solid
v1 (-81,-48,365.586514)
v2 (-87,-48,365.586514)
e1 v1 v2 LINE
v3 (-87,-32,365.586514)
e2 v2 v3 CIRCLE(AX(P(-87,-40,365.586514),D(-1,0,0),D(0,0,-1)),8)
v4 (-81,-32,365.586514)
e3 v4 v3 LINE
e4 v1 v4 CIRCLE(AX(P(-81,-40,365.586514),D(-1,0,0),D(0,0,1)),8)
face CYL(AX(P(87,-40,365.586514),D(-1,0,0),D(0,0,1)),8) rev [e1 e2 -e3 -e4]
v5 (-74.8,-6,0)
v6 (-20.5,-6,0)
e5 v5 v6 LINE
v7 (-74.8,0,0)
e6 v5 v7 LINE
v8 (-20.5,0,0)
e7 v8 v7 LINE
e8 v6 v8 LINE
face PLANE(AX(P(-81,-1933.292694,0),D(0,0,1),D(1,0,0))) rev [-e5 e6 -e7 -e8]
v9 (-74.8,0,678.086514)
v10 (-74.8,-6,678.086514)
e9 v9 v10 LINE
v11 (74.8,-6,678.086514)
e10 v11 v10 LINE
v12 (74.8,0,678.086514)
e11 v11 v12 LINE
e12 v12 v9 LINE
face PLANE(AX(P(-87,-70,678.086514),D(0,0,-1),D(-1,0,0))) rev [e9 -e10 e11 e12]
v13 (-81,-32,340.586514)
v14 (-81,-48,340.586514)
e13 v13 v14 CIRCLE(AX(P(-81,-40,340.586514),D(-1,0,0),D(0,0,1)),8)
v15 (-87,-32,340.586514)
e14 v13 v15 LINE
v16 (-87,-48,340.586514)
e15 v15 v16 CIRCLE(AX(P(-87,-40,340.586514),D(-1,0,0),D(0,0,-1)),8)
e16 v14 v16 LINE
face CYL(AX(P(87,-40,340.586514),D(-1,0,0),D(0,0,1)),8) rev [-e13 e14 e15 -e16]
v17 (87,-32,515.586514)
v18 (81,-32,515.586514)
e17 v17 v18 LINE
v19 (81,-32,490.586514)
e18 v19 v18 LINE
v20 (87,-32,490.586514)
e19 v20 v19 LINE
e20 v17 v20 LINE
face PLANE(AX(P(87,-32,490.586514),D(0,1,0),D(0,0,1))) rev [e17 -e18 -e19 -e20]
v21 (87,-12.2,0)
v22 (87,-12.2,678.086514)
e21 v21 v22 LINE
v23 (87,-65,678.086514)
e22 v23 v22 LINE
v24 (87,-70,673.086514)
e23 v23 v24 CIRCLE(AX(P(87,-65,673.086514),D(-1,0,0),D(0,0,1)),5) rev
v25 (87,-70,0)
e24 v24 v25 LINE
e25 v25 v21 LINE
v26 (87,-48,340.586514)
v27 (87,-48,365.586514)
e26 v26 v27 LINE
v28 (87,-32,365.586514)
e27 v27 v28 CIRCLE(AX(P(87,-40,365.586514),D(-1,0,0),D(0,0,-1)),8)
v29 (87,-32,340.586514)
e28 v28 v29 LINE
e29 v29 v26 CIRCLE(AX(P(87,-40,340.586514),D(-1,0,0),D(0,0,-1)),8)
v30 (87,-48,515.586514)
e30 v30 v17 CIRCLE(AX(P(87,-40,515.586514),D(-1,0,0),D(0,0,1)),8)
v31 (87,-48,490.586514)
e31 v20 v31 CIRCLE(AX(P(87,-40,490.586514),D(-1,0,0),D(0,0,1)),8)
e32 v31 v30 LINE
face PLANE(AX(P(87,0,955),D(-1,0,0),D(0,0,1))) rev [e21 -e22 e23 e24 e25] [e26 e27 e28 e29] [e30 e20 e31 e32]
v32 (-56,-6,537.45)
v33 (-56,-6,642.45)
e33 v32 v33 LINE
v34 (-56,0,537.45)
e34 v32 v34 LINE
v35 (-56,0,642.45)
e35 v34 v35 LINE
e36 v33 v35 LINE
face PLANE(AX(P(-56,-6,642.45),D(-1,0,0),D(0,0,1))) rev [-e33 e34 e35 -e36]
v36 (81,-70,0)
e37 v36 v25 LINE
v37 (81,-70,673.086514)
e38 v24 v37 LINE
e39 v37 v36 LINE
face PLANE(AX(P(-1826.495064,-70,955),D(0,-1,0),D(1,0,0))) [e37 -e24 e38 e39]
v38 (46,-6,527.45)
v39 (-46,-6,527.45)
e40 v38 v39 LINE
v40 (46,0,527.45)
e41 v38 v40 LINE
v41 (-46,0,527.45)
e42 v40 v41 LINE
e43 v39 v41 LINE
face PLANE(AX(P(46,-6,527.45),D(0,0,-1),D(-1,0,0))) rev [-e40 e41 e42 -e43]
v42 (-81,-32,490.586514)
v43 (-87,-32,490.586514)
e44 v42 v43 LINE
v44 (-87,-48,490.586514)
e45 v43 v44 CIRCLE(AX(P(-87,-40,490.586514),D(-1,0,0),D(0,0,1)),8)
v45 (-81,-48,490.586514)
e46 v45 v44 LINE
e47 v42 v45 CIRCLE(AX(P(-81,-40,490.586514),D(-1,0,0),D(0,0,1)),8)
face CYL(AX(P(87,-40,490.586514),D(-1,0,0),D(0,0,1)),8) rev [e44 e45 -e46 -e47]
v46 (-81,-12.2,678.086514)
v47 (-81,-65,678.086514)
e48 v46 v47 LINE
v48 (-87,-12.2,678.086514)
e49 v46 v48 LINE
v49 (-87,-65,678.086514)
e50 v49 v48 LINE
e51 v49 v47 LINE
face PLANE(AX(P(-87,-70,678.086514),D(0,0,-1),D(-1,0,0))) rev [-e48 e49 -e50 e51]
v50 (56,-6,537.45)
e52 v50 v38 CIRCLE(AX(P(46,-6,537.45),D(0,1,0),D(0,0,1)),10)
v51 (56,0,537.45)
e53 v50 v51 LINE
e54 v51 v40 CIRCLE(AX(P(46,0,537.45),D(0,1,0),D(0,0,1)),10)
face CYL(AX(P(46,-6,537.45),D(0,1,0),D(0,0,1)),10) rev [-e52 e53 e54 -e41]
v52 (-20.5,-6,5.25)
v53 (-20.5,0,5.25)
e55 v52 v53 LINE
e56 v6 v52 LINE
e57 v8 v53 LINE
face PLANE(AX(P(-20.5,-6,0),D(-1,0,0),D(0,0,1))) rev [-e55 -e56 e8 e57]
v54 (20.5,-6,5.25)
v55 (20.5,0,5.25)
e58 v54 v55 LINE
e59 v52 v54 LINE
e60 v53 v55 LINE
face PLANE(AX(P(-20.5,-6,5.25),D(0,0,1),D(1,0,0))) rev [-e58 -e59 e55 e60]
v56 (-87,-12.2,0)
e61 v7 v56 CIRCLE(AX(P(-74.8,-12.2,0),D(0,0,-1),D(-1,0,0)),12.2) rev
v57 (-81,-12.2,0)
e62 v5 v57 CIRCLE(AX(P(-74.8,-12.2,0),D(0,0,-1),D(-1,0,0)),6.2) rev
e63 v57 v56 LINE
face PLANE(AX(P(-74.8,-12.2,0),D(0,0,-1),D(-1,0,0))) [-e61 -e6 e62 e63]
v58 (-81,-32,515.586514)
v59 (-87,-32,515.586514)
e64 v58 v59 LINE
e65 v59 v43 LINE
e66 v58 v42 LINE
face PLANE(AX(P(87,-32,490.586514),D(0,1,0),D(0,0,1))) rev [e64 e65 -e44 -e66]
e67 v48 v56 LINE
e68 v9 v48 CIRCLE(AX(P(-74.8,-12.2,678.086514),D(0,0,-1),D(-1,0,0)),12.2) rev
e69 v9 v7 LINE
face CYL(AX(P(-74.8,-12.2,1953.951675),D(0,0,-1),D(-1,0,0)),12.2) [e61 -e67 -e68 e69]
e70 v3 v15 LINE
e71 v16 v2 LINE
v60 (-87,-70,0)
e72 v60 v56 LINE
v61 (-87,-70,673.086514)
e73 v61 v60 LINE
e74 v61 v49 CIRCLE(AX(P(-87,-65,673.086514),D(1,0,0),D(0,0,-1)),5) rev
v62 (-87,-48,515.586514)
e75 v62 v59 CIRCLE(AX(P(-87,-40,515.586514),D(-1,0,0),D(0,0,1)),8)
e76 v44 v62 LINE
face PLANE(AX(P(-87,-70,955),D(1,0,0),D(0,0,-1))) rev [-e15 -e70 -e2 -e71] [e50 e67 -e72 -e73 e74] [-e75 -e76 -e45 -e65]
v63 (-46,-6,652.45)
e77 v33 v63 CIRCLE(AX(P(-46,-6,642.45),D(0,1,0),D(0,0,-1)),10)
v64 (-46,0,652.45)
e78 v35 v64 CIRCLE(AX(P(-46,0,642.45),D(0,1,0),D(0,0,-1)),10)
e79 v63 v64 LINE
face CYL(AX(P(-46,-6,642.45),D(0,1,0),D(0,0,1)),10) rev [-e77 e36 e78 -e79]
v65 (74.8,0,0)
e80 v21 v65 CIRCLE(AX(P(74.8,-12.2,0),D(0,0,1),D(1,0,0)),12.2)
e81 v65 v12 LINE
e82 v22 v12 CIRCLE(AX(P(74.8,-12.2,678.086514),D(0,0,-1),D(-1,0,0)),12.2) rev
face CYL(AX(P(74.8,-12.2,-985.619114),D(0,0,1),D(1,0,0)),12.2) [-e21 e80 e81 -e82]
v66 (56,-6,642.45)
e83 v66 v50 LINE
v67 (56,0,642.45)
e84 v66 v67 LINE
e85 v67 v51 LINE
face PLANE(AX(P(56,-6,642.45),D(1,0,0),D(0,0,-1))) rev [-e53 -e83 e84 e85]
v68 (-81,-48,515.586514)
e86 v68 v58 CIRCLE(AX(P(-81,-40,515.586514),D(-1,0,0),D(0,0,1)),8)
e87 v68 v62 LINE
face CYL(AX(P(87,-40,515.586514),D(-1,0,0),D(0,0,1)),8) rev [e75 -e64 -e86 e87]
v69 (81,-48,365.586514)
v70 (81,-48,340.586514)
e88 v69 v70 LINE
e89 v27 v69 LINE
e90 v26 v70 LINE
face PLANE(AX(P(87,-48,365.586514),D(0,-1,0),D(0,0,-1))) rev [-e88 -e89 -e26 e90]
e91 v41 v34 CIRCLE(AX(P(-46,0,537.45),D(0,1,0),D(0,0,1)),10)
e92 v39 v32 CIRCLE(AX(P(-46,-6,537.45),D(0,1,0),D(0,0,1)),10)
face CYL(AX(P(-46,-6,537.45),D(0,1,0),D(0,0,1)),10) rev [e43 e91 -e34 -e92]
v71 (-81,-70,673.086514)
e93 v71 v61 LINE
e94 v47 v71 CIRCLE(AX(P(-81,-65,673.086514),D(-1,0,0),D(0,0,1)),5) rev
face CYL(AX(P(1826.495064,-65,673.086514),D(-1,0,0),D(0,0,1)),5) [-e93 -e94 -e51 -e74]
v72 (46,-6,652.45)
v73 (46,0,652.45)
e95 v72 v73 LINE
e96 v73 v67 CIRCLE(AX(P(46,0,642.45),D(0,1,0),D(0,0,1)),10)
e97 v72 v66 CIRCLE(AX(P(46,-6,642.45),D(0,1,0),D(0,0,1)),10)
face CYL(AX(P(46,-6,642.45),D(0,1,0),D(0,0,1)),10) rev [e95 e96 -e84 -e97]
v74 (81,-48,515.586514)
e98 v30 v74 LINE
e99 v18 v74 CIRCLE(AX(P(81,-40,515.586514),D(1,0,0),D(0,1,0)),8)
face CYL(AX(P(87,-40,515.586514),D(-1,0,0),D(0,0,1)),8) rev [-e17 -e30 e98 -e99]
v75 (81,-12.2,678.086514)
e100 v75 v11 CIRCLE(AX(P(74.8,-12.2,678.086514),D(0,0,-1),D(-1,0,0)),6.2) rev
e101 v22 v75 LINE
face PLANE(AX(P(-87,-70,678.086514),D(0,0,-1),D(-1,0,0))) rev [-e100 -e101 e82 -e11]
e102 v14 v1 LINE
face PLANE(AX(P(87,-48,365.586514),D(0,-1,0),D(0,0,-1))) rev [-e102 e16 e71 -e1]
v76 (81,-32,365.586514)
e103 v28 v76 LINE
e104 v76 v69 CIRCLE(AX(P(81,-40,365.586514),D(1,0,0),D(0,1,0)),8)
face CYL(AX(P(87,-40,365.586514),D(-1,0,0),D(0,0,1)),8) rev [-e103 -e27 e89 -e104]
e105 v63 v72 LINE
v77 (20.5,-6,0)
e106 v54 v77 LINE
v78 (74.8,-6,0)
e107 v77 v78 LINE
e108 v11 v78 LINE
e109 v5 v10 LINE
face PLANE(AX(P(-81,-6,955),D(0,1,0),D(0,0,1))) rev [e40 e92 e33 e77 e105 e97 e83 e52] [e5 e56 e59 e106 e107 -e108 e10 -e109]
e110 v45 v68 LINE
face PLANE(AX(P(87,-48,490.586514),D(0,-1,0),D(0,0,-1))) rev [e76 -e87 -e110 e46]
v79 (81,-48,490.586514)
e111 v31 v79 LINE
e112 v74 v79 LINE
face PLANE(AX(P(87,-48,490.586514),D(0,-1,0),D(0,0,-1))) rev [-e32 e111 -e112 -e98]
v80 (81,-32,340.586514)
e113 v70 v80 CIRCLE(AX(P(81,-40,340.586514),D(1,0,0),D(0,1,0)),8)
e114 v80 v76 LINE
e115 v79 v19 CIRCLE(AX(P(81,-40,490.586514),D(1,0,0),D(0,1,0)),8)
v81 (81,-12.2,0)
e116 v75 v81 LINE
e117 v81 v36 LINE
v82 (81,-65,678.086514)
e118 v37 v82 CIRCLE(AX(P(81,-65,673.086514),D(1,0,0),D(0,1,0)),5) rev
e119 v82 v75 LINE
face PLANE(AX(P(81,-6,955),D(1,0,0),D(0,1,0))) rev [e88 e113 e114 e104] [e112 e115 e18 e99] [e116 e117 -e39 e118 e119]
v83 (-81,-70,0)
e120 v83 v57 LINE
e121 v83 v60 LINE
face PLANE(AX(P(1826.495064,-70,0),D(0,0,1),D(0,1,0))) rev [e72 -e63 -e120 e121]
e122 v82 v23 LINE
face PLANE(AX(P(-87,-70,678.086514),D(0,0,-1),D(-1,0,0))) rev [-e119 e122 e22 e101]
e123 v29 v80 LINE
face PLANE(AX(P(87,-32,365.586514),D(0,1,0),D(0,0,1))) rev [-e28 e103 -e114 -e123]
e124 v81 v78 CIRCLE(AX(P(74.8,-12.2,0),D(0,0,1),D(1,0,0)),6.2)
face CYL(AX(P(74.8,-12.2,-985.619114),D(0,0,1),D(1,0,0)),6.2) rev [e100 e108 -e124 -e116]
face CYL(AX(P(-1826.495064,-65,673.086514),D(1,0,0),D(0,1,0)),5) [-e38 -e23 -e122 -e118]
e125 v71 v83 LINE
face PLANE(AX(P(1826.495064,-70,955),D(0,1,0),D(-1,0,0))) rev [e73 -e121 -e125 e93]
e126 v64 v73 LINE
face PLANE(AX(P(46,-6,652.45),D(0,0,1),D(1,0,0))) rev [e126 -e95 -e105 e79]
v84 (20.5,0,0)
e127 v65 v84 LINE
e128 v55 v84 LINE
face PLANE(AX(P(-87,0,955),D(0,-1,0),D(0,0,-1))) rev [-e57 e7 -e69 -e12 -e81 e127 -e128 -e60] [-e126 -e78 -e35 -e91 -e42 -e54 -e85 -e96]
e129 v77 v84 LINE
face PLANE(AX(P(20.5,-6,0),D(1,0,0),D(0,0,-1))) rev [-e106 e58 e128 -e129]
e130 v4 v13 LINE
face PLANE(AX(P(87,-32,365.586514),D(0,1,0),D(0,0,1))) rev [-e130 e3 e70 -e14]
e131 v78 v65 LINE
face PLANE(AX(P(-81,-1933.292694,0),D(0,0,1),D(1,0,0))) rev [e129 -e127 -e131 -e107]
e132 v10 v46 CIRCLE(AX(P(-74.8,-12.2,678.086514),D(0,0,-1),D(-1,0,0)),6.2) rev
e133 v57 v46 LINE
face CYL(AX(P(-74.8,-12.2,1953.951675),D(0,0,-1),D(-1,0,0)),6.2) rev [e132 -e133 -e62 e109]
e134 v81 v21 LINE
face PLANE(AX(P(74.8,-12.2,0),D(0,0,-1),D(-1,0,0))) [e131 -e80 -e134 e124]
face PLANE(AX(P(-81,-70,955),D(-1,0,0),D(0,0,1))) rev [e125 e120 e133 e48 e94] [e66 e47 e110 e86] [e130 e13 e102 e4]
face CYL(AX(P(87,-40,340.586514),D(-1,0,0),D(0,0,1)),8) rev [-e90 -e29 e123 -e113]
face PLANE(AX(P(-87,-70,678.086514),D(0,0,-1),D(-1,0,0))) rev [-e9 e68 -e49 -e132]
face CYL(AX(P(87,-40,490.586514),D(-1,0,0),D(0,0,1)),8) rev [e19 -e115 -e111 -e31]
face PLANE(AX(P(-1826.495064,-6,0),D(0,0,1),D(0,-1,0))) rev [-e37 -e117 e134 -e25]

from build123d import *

# Parameters (mm, degrees)
BOSS_EXTRUDE1_DEPTH        = 955
FLATTEN_BENDS1_OUTLINE_W   = 6
FLATTEN_BENDS1_OUTLINE_H   = 64
FLATTEN_BENDS1_DEPTH       = 955
FLATTEN_BENDS1_2_OUTLINE_W = 59.495264307
FLATTEN_BENDS1_2_OUTLINE_H = 6
FLATTEN_BENDS1_2_DEPTH     = 955
PROCESS_BENDS1_DEPTH       = 955
PROCESS_BENDS1_2_DEPTH     = 955
BOSS_EXTRUDE2_DEPTH        = 6
EDGE_FLANGE1_DEPTH         = 206.725155702
EDGE_FLANGE1_BEND_DEPTH    = 206.725155702
CUT_EXTRUDE1_DEPTH         = 15
CUT_EXTRUDE2_START         = -25.25
CUT_EXTRUDE2_DEPTH         = 25.25
SKETCH17_W                 = 20.5
SKETCH17_H                 = 7
CUT_EXTRUDE3_DEPTH         = 10
FILLET1_R                  = 10
SKETCH18_W                 = 41
SKETCH18_H                 = 5.25
CUT_EXTRUDE4_DEPTH         = 10
SKETCH19_W                 = 174
SKETCH19_H                 = 480
CUT_EXTRUDE5_DEPTH         = 1164.457508004
FILLET2_R                  = 5
CUT_EXTRUDE6_DEPTH         = 704.546245741


# Read off the part's stored shape, not the designer's step: Flatten-Bends1, Process-Bends1, Cut-Extrude2
# Sheet-metal steps are written as plain solids
with BuildPart() as part:
    # Sketch1 → Boss-Extrude1 (new body)
    with BuildSketch(Plane.XY):
        Polygon((-87, -70), (-87, 0), (87, 0), (87, -70), (81, -70), (81, -6), (-81, -6), (-81, -70), align=None)
    extrude(amount=BOSS_EXTRUDE1_DEPTH)

    # Flatten-Bends1 outline → Flatten-Bends1 (cut)
    with BuildSketch(Plane.XY):
        with Locations((-84, -38)):
            Rectangle(FLATTEN_BENDS1_OUTLINE_W, FLATTEN_BENDS1_OUTLINE_H)
        with Locations((84, -38)):
            Rectangle(FLATTEN_BENDS1_OUTLINE_W, FLATTEN_BENDS1_OUTLINE_H)
    extrude(amount=FLATTEN_BENDS1_DEPTH, mode=Mode.SUBTRACT)

    # Flatten-Bends1 2 outline → Flatten-Bends1 2 (add)
    with BuildSketch(Plane.XY):
        with Locations((-116.747632154, -3)):
            Rectangle(FLATTEN_BENDS1_2_OUTLINE_W, FLATTEN_BENDS1_2_OUTLINE_H)
        with Locations((116.747632154, -3)):
            Rectangle(FLATTEN_BENDS1_2_OUTLINE_W, FLATTEN_BENDS1_2_OUTLINE_H)
    extrude(amount=FLATTEN_BENDS1_2_DEPTH)

    # Process-Bends1 outline → Process-Bends1 (cut)
    with BuildSketch(Plane.XY):
        with BuildLine():
            ThreePointArc((74.8, 0), (80.849793384, -1.60566189), (85.307140429, -6))
            Line((85.307140429, -6), (146.495264307, -6))
            Line((146.495264307, -6), (146.495264307, 0))
            Line((146.495264307, 0), (74.8, 0))
        make_face()
        with BuildLine():
            Line((-146.495264307, -6), (-85.307140429, -6))
            ThreePointArc((-85.307140429, -6), (-80.849793384, -1.60566189), (-74.8, 0))
            Line((-74.8, 0), (-146.495264307, 0))
            Line((-146.495264307, 0), (-146.495264307, -6))
        make_face()
    extrude(amount=PROCESS_BENDS1_DEPTH, mode=Mode.SUBTRACT)

    # Process-Bends1 2 outline → Process-Bends1 2 (add)
    with BuildSketch(Plane.XY):
        with BuildLine():
            Line((81, -12.2), (81, -70))
            Line((81, -70), (87, -70))
            Line((87, -70), (87, -12.2))
            ThreePointArc((87, -12.2), (86.569178247, -8.986521607), (85.307140429, -6))
            Line((85.307140429, -6), (74.8, -6))
            ThreePointArc((74.8, -6), (79.184062043, -7.815937957), (81, -12.2))
        make_face()
        with BuildLine():
            Line((-87, -70), (-81, -70))
            Line((-81, -70), (-81, -12.2))
            ThreePointArc((-81, -12.2), (-79.184062043, -7.815937957), (-74.8, -6))
            Line((-74.8, -6), (-85.307140429, -6))
            ThreePointArc((-85.307140429, -6), (-86.569178247, -8.986521607), (-87, -12.2))
            Line((-87, -12.2), (-87, -70))
        make_face()
    extrude(amount=PROCESS_BENDS1_2_DEPTH)

    # Sketch8 → Boss-Extrude2 (add)
    with BuildSketch(Plane(origin=(0, 0, 0), x_dir=(1, 0, 0), z_dir=(0, 1, 0))):
        Polygon((-74.8, -955), (-22.5, -1155), (22.5, -1155), (74.8, -955), align=None)
    extrude(amount=-BOSS_EXTRUDE2_DEPTH)

    # Edge-Flange1 section (across the edge) → Edge-Flange1 (add)
    with BuildSketch(Plane(origin=(80.798302412, -6, 956.568556081), x_dir=(-0.9674681309145718, -3.491481338843133e-15, -0.25299291623416037), z_dir=(-0.25299291623416037, 0, 0.9674681309145718))):
        with BuildLine():
            Line((-6, 6.2), (-6, 64))
            Line((-6, 64), (0, 64))
            Line((0, 64), (0, 6.2))
            ThreePointArc((0, 6.2), (1.815937957, 1.815937957), (6.2, 0))
            Line((6.2, 0), (6.2, -6))
            ThreePointArc((6.2, -6), (-2.42670273, -2.42670273), (-6, 6.2))
        make_face()
    extrude(amount=EDGE_FLANGE1_DEPTH)

    # Edge-Flange1 section 2 (across the edge) → Edge-Flange1 bend (add)
    with BuildSketch(Plane(origin=(-28.498302412, -6, 1156.568556081), x_dir=(0.9674681309145718, -3.4914813388431337e-15, -0.25299291623416087), z_dir=(-0.25299291623416087, 0, -0.9674681309145718))):
        with BuildLine():
            Line((-6, 6.2), (-6, 64))
            Line((-6, 64), (0, 64))
            Line((0, 64), (0, 6.2))
            ThreePointArc((0, 6.2), (1.815937957, 1.815937957), (6.2, 0))
            Line((6.2, 0), (6.2, -6))
            ThreePointArc((6.2, -6), (-2.42670273, -2.42670273), (-6, 6.2))
        make_face()
    extrude(amount=EDGE_FLANGE1_BEND_DEPTH)

    # Sketch15 → Cut-Extrude1 (cut)
    with BuildSketch(Plane(origin=(0, 0, 0), x_dir=(1, 0, 0), z_dir=(0, 1, 0))):
        with BuildLine():
            Line((46, -652.45), (-46, -652.45))
            ThreePointArc((-46, -652.45), (-53.071067812, -649.521067812), (-56, -642.45))
            Line((-56, -642.45), (-56, -537.45))
            ThreePointArc((-56, -537.45), (-53.071067812, -530.378932188), (-46, -527.45))
            Line((-46, -527.45), (46, -527.45))
            ThreePointArc((46, -527.45), (53.071067812, -530.378932188), (56, -537.45))
            Line((56, -537.45), (56, -642.45))
            ThreePointArc((56, -642.45), (53.071067812, -649.521067812), (46, -652.45))
        make_face()
    extrude(amount=-CUT_EXTRUDE1_DEPTH, mode=Mode.SUBTRACT)

    # Cut-Extrude2 outline → Cut-Extrude2 (cut)
    with BuildSketch(Plane.XZ.offset(70).offset(CUT_EXTRUDE2_START)):
        Polygon((-53.676734498, 1084), (-47.871925712, 1082.482042503), (-45.644479827, 1091), (-51.449288612, 1092.517957497), align=None)
        Polygon((45.644479827, 1091), (47.871925713, 1082.482042503), (53.676734498, 1084), (51.449288612, 1092.517957497), align=None)
    extrude(amount=CUT_EXTRUDE2_DEPTH, mode=Mode.SUBTRACT)

    # Sketch17 → Cut-Extrude3 (cut)
    with BuildSketch(Plane.XZ.offset(6)):
        with Locations((0, 1087.5)):
            Rectangle(SKETCH17_W, SKETCH17_H)
    extrude(amount=-CUT_EXTRUDE3_DEPTH, mode=Mode.SUBTRACT)

    # Fillet1
    fillet1_edges = [part.edges().sort_by_distance(p)[0] for p in [
        (31.400706804, -70, 1157.327534829),
        (-31.400706804, -70, 1157.327534829),
    ]]
    fillet(fillet1_edges, radius=FILLET1_R)

    # Sketch18 → Cut-Extrude4 (cut)
    with BuildSketch(Plane(origin=(0, 0, 0), x_dir=(1, 0, 0), z_dir=(0, 1, 0))):
        with Locations((0, -2.625)):
            Rectangle(SKETCH18_W, SKETCH18_H)
    extrude(amount=-CUT_EXTRUDE4_DEPTH, mode=Mode.SUBTRACT)

    # Sketch19 → Cut-Extrude5 (cut, through all)
    with BuildSketch(Plane(origin=(0, 0, 0), x_dir=(1, 0, 0), z_dir=(0, 1, 0))):
        with Locations((0, -918.086513578)):
            Rectangle(SKETCH19_W, SKETCH19_H)
    extrude(amount=-CUT_EXTRUDE5_DEPTH, mode=Mode.SUBTRACT)

    # Fillet2
    fillet2_edges = [part.edges().sort_by_distance(p)[0] for p in [
        (84, -70, 678.086513578),
        (-84, -70, 678.086513578),
    ]]
    fillet(fillet2_edges, radius=FILLET2_R)

    # Sketch20 → Cut-Extrude6 (cut, through all)
    with BuildSketch(Plane.ZY.offset(87)):
        with BuildLine():
            Line((490.586513578, -32), (515.586513578, -32))
            ThreePointArc((515.586513578, -32), (523.586513578, -40), (515.586513578, -48))
            Line((515.586513578, -48), (490.586513578, -48))
            ThreePointArc((490.586513578, -48), (482.586513578, -40), (490.586513578, -32))
        make_face()
        with BuildLine():
            Line((365.586513578, -32), (340.586513578, -32))
            ThreePointArc((340.586513578, -32), (332.586513578, -40), (340.586513578, -48))
            Line((340.586513578, -48), (365.586513578, -48))
            ThreePointArc((365.586513578, -48), (373.586513578, -40), (365.586513578, -32))
        make_face()
    extrude(amount=-CUT_EXTRUDE6_DEPTH, mode=Mode.SUBTRACT)


solid = part.part
